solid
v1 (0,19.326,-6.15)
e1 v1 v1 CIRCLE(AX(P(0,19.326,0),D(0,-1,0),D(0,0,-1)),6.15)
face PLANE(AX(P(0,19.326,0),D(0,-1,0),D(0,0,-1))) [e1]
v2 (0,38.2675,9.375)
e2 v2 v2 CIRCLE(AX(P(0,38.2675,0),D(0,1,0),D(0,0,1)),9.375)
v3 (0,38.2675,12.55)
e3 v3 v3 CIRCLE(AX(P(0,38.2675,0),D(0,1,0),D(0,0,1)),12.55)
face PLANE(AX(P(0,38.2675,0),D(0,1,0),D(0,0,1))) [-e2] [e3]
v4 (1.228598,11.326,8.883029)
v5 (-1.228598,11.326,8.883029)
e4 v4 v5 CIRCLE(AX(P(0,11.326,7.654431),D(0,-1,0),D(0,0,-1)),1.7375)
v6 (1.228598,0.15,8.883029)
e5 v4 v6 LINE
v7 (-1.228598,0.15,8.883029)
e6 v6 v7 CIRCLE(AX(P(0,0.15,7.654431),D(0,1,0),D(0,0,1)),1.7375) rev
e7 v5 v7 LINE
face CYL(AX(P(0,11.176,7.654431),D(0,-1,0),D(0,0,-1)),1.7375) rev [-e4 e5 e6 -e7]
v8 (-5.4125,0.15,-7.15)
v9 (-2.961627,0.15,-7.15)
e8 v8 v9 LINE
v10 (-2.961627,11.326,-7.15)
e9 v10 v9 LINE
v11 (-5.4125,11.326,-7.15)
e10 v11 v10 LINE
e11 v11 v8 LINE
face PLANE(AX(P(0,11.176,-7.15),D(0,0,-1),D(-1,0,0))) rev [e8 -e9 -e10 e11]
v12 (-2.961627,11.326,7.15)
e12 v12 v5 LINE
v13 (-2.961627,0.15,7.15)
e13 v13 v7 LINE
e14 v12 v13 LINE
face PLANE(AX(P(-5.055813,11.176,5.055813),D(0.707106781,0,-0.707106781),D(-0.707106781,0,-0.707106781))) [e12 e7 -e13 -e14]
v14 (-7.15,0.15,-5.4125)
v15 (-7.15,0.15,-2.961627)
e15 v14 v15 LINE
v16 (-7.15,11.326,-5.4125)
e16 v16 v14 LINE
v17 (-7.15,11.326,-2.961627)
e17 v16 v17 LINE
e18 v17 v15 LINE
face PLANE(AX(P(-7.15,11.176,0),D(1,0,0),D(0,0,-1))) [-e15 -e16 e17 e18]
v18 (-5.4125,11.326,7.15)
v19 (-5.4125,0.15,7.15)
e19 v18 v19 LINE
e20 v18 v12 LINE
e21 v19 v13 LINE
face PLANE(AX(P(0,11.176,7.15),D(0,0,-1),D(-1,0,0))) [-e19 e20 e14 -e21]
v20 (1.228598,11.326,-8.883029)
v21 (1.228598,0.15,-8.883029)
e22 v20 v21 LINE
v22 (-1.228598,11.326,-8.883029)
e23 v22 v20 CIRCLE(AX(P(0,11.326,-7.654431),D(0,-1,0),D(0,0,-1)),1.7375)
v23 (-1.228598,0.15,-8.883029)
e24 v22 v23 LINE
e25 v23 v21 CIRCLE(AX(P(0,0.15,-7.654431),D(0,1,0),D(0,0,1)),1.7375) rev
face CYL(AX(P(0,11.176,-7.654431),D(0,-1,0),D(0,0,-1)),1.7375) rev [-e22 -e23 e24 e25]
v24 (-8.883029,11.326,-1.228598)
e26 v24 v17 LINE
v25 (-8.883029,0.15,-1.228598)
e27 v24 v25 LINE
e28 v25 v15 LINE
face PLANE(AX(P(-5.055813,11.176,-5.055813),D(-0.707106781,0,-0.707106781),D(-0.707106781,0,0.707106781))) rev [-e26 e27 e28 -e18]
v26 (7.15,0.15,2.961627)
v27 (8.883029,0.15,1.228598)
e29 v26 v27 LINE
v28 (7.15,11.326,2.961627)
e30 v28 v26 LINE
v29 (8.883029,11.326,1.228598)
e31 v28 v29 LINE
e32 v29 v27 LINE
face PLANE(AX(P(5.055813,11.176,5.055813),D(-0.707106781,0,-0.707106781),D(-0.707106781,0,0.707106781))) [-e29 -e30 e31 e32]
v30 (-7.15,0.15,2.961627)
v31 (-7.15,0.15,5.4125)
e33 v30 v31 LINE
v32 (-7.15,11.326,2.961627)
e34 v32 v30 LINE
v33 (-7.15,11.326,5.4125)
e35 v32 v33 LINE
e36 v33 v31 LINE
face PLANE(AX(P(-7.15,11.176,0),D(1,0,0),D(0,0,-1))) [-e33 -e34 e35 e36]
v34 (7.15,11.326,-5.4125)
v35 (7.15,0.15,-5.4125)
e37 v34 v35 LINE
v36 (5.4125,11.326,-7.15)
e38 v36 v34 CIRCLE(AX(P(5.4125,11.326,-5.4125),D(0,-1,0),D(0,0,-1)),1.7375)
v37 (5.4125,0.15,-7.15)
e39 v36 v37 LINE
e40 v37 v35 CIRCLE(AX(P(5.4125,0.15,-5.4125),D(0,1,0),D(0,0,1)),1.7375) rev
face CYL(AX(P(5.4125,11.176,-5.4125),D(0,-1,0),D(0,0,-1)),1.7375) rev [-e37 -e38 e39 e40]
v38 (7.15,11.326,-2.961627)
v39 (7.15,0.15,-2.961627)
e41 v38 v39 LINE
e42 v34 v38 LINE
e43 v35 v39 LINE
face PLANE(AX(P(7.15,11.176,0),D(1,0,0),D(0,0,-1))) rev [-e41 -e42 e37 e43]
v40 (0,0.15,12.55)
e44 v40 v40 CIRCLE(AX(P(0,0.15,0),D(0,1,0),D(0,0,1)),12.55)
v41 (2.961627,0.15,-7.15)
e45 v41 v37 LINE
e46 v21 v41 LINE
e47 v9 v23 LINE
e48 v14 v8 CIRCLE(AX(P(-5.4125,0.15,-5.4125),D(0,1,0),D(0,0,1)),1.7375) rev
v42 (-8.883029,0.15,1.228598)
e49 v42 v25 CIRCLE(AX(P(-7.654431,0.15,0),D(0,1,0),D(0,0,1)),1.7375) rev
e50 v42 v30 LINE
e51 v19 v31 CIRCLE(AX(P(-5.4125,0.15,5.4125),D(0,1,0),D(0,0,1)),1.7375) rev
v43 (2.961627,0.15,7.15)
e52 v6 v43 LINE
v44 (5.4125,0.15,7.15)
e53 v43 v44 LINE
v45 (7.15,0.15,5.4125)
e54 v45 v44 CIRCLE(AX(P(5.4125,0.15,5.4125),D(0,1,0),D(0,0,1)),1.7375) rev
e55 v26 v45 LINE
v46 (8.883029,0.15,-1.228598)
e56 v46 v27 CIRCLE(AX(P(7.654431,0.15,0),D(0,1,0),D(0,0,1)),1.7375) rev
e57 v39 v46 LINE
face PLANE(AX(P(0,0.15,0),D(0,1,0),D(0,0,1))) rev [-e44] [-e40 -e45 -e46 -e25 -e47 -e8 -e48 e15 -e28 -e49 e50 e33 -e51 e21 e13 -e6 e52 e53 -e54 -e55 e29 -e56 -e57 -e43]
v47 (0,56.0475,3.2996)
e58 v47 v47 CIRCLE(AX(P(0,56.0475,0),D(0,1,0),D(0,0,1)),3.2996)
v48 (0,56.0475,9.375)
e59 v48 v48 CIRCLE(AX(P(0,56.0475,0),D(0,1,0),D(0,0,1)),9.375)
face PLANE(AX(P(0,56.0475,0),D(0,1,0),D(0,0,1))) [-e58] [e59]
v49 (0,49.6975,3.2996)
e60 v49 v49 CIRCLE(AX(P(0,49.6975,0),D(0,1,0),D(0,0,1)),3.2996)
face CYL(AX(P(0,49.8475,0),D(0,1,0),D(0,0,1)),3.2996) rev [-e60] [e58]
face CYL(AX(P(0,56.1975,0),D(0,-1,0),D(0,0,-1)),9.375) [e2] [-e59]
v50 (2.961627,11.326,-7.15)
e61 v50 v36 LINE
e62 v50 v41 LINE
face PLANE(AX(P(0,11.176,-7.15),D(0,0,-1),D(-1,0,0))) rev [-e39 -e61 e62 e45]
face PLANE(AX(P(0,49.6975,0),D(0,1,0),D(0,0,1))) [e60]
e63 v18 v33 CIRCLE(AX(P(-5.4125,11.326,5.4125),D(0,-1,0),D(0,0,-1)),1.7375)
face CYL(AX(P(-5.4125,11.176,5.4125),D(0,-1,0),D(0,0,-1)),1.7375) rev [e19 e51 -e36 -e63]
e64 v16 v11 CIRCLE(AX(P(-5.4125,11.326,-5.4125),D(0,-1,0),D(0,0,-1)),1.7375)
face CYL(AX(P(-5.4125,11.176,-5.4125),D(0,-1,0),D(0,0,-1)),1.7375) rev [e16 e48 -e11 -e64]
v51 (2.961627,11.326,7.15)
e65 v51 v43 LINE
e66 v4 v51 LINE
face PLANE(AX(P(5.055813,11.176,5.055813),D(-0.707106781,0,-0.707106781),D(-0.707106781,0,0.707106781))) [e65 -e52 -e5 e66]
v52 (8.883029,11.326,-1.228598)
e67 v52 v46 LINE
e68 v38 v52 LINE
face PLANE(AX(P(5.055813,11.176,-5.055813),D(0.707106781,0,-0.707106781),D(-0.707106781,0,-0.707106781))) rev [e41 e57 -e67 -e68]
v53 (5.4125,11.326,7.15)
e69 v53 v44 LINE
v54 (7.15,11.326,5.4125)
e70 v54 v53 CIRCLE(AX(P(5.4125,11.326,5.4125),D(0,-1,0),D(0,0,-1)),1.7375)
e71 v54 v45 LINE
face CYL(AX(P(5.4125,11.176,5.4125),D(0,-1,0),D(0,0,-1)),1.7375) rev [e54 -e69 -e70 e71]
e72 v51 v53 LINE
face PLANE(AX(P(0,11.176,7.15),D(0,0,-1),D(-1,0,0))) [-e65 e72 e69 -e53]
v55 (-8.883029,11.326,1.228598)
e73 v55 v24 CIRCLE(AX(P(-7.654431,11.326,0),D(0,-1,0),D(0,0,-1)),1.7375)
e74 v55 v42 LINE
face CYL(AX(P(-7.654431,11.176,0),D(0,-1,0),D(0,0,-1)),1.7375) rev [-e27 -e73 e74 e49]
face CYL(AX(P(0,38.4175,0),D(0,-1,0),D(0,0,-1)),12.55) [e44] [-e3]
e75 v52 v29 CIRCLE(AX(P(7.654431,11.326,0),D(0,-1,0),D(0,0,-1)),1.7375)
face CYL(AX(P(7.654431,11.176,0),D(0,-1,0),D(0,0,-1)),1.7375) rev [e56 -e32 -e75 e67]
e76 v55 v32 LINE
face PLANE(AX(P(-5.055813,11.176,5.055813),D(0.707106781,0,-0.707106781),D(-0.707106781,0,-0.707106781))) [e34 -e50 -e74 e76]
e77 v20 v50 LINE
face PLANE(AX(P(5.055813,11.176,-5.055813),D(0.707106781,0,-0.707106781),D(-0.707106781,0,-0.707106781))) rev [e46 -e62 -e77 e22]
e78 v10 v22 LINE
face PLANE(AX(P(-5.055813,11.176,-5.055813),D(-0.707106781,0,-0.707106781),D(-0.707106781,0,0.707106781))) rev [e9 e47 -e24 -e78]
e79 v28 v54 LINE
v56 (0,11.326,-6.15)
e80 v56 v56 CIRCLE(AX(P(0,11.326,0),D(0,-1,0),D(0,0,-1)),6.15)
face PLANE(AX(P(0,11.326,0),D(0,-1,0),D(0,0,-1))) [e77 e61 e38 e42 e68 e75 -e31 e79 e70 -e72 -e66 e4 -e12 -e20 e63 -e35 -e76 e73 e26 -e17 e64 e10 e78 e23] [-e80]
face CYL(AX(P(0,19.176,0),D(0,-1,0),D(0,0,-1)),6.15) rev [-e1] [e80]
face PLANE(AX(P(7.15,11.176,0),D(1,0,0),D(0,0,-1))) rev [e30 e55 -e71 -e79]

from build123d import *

# Parameters (mm, degrees)
SKETCH1_R            = 12.7
BOSS_EXTRUDE1_DEPTH  = 38.4175
SKETCH4_R            = 9.525
BOSS_EXTRUDE2_DEPTH  = 17.78
CUT_EXTRUDE1_DEPTH   = 11.176
SKETCH3_R            = 6
CUT_EXTRUDE2_DEPTH   = 8
SKETCH6_R            = 3.1496
CUT_EXTRUDE3_DEPTH   = 6.35
SPLIT1_START         = 11.325999954
SPLIT1_OUTLINE_R     = 12.550000046
SPLIT1_OUTLINE_R_2   = 6.149999954
SPLIT1_DEPTH         = 26.941500092
SPLIT1_START_2       = 19.325999954
SPLIT1_2_OUTLINE_R   = 9.375000046
SPLIT1_2_OUTLINE_R_2 = 3.299599954
SPLIT1_2_DEPTH       = 36.721500092
SPLIT1_START_3       = 0.149999954
SPLIT1_3_OUTLINE_R   = 12.550000046
SPLIT1_3_DEPTH       = 11.176
SPLIT1_4_OUTLINE_R   = 3.299599954
SPLIT1_4_DEPTH       = 30.371500092
SPLIT1_5_OUTLINE_R   = 12.550000046
SPLIT1_5_OUTLINE_R_2 = 6.149999954
SPLIT1_5_DEPTH       = 26.941500092
SPLIT1_6_OUTLINE_R   = 9.375000046
SPLIT1_6_OUTLINE_R_2 = 3.299599954
SPLIT1_6_DEPTH       = 36.721500092
SPLIT1_7_OUTLINE_R   = 12.550000046
SPLIT1_7_DEPTH       = 11.176
SPLIT1_8_OUTLINE_R   = 3.299599954
SPLIT1_8_DEPTH       = 30.371500092


with BuildPart() as part:
    # Sketch1 → Boss-Extrude1 (new body)
    with BuildSketch(Plane(origin=(0, 0, 0), x_dir=(1, 0, 0), z_dir=(0, 1, 0))):
        with Locations(Location((0, 0, 0), (0, 0, 270))):
            Circle(SKETCH1_R)
    extrude(amount=BOSS_EXTRUDE1_DEPTH)

    # Sketch4 → Boss-Extrude2 (add)
    with BuildSketch(Plane(origin=(0, 38.4175, 0), x_dir=(1, 0, 0), z_dir=(0, 1, 0))):
        with Locations(Location((0, 0, 0), (0, 0, 270))):
            Circle(SKETCH4_R)
    extrude(amount=BOSS_EXTRUDE2_DEPTH)

    # Sketch2 → Cut-Extrude1 (cut)
    with BuildSketch(Plane.XZ):
        with BuildLine():
            Line((-7, 2.899494937), (-8.776962921, 1.122532015))
            ThreePointArc((-8.776962921, 1.122532015), (-9.241930906, 0), (-8.776962921, -1.122532015))
            Line((-8.776962921, -1.122532015), (-7, -2.899494937))
            Line((-7, -2.899494937), (-7, 2.899494937))
        make_face()
        Polygon((-2.899494937, 7), (-7, 2.899494937), (-7, -2.899494937), (-2.899494937, -7), (2.899494937, -7), (7, -2.899494937), (7, 2.899494937), (2.899494937, 7), align=None)
        with BuildLine():
            Line((-7, 5.4125), (-7, 2.899494937))
            Line((-7, 2.899494937), (-2.899494937, 7))
            Line((-2.899494937, 7), (-5.4125, 7))
            ThreePointArc((-5.4125, 7), (-6.535032015, 6.535032015), (-7, 5.4125))
        make_face()
        with BuildLine():
            Line((-1.122532015, 8.776962921), (-2.899494937, 7))
            Line((-2.899494937, 7), (2.899494937, 7))
            Line((2.899494937, 7), (1.122532015, 8.776962921))
            ThreePointArc((1.122532015, 8.776962921), (0, 9.241930906), (-1.122532015, 8.776962921))
        make_face()
        with BuildLine():
            Line((5.4125, 7), (2.899494937, 7))
            Line((2.899494937, 7), (7, 2.899494937))
            Line((7, 2.899494937), (7, 5.4125))
            ThreePointArc((7, 5.4125), (6.535032015, 6.535032015), (5.4125, 7))
        make_face()
        with BuildLine():
            Line((8.776962921, 1.122532015), (7, 2.899494937))
            Line((7, 2.899494937), (7, -2.899494937))
            Line((7, -2.899494937), (8.776962921, -1.122532015))
            ThreePointArc((8.776962921, -1.122532015), (9.241930906, 0), (8.776962921, 1.122532015))
        make_face()
        with BuildLine():
            Line((7, -2.899494937), (2.899494937, -7))
            Line((2.899494937, -7), (5.4125, -7))
            ThreePointArc((5.4125, -7), (6.535032015, -6.535032015), (7, -5.4125))
            Line((7, -5.4125), (7, -2.899494937))
        make_face()
        with BuildLine():
            Line((2.899494937, -7), (-2.899494937, -7))
            Line((-2.899494937, -7), (-1.122532015, -8.776962921))
            ThreePointArc((-1.122532015, -8.776962921), (0, -9.241930906), (1.122532015, -8.776962921))
            Line((1.122532015, -8.776962921), (2.899494937, -7))
        make_face()
        with BuildLine():
            Line((-2.899494937, -7), (-7, -2.899494937))
            Line((-7, -2.899494937), (-7, -5.4125))
            ThreePointArc((-7, -5.4125), (-6.535032015, -6.535032015), (-5.4125, -7))
            Line((-5.4125, -7), (-2.899494937, -7))
        make_face()
    extrude(amount=-CUT_EXTRUDE1_DEPTH, mode=Mode.SUBTRACT)

    # Sketch3 → Cut-Extrude2 (cut)
    with BuildSketch(Plane.XZ.offset(-11.176)):
        with Locations(Location((0, 0, 0), (0, 0, 270))):
            Circle(SKETCH3_R)
    extrude(amount=-CUT_EXTRUDE2_DEPTH, mode=Mode.SUBTRACT)

    # Sketch6 → Cut-Extrude3 (cut)
    with BuildSketch(Plane(origin=(0, 56.1975, 0), x_dir=(1, 0, 0), z_dir=(0, 1, 0))):
        with Locations(Location((0, 0, 0), (0, 0, 270))):
            Circle(SKETCH6_R)
    extrude(amount=-CUT_EXTRUDE3_DEPTH, mode=Mode.SUBTRACT)

    # Split1 5 outline → Split1 5 (cut)
    with BuildSketch(Plane(origin=(0, 0, 0), x_dir=(1, 0, 0), z_dir=(0, 1, 0)).offset(SPLIT1_START)):
        Circle(SPLIT1_5_OUTLINE_R)
        Circle(SPLIT1_5_OUTLINE_R_2, mode=Mode.SUBTRACT)
    extrude(amount=SPLIT1_5_DEPTH, mode=Mode.SUBTRACT)

    # Split1 6 outline → Split1 6 (cut)
    with BuildSketch(Plane(origin=(0, 0, 0), x_dir=(1, 0, 0), z_dir=(0, 1, 0)).offset(SPLIT1_START_2)):
        Circle(SPLIT1_6_OUTLINE_R)
        Circle(SPLIT1_6_OUTLINE_R_2, mode=Mode.SUBTRACT)
    extrude(amount=SPLIT1_6_DEPTH, mode=Mode.SUBTRACT)

    # Split1 7 outline → Split1 7 (cut)
    with BuildSketch(Plane(origin=(0, 0, 0), x_dir=(1, 0, 0), z_dir=(0, 1, 0)).offset(SPLIT1_START_3)):
        Circle(SPLIT1_7_OUTLINE_R)
        with BuildLine():
            Line((-7.149999954, -2.961626952), (-8.883028906, -1.228598))
            ThreePointArc((-8.883028906, -1.228598), (-9.39193086, 0), (-8.883028906, 1.228598))
            Line((-8.883028906, 1.228598), (-7.149999954, 2.961626952))
            Line((-7.149999954, 2.961626952), (-7.149999954, 5.4125))
            ThreePointArc((-7.149999954, 5.4125), (-6.641098, 6.641098), (-5.4125, 7.149999954))
            Line((-5.4125, 7.149999954), (-2.961626952, 7.149999954))
            Line((-2.961626952, 7.149999954), (-1.228598, 8.883028906))
            ThreePointArc((-1.228598, 8.883028906), (0, 9.39193086), (1.228598, 8.883028906))
            Line((1.228598, 8.883028906), (2.961626952, 7.149999954))
            Line((2.961626952, 7.149999954), (5.4125, 7.149999954))
            ThreePointArc((5.4125, 7.149999954), (6.641098, 6.641098), (7.149999954, 5.4125))
            Line((7.149999954, 5.4125), (7.149999954, 2.961626952))
            Line((7.149999954, 2.961626952), (8.883028906, 1.228598))
            ThreePointArc((8.883028906, 1.228598), (9.39193086, 0), (8.883028906, -1.228598))
            Line((8.883028906, -1.228598), (7.149999954, -2.961626952))
            Line((7.149999954, -2.961626952), (7.149999954, -5.4125))
            ThreePointArc((7.149999954, -5.4125), (6.641098, -6.641098), (5.4125, -7.149999954))
            Line((5.4125, -7.149999954), (2.961626952, -7.149999954))
            Line((2.961626952, -7.149999954), (1.228598, -8.883028906))
            ThreePointArc((1.228598, -8.883028906), (0, -9.39193086), (-1.228598, -8.883028906))
            Line((-1.228598, -8.883028906), (-2.961626952, -7.149999954))
            Line((-2.961626952, -7.149999954), (-5.4125, -7.149999954))
            ThreePointArc((-5.4125, -7.149999954), (-6.641098, -6.641098), (-7.149999954, -5.4125))
            Line((-7.149999954, -5.4125), (-7.149999954, -2.961626952))
        make_face(mode=Mode.SUBTRACT)
    extrude(amount=SPLIT1_7_DEPTH, mode=Mode.SUBTRACT)

    # Split1 8 outline → Split1 8 (cut)
    with BuildSketch(Plane(origin=(0, 0, 0), x_dir=(1, 0, 0), z_dir=(0, 1, 0)).offset(SPLIT1_START_2)):
        Circle(SPLIT1_8_OUTLINE_R)
    extrude(amount=SPLIT1_8_DEPTH, mode=Mode.SUBTRACT)


with BuildPart() as body_2:
    # Split1: read off the stored shape, not the designer's step
    # Split1 outline → Split1 (new body)
    with BuildSketch(Plane(origin=(0, 0, 0), x_dir=(1, 0, 0), z_dir=(0, 1, 0)).offset(SPLIT1_START)):
        Circle(SPLIT1_OUTLINE_R)
        Circle(SPLIT1_OUTLINE_R_2, mode=Mode.SUBTRACT)
    extrude(amount=SPLIT1_DEPTH)

    # Split1 2 outline → Split1 2 (add)
    with BuildSketch(Plane(origin=(0, 0, 0), x_dir=(1, 0, 0), z_dir=(0, 1, 0)).offset(SPLIT1_START_2)):
        Circle(SPLIT1_2_OUTLINE_R)
        Circle(SPLIT1_2_OUTLINE_R_2, mode=Mode.SUBTRACT)
    extrude(amount=SPLIT1_2_DEPTH)

    # Split1 3 outline → Split1 3 (add)
    with BuildSketch(Plane(origin=(0, 0, 0), x_dir=(1, 0, 0), z_dir=(0, 1, 0)).offset(SPLIT1_START_3)):
        Circle(SPLIT1_3_OUTLINE_R)
        with BuildLine():
            Line((7.149999954, 5.4125), (7.149999954, 2.961626952))
            Line((7.149999954, 2.961626952), (8.883028906, 1.228598))
            ThreePointArc((8.883028906, 1.228598), (9.39193086, 0), (8.883028906, -1.228598))
            Line((8.883028906, -1.228598), (7.149999954, -2.961626952))
            Line((7.149999954, -2.961626952), (7.149999954, -5.4125))
            ThreePointArc((7.149999954, -5.4125), (6.641098, -6.641098), (5.4125, -7.149999954))
            Line((5.4125, -7.149999954), (2.961626952, -7.149999954))
            Line((2.961626952, -7.149999954), (1.228598, -8.883028906))
            ThreePointArc((1.228598, -8.883028906), (0, -9.39193086), (-1.228598, -8.883028906))
            Line((-1.228598, -8.883028906), (-2.961626952, -7.149999954))
            Line((-2.961626952, -7.149999954), (-5.4125, -7.149999954))
            ThreePointArc((-5.4125, -7.149999954), (-6.641098, -6.641098), (-7.149999954, -5.4125))
            Line((-7.149999954, -5.4125), (-7.149999954, -2.961626952))
            Line((-7.149999954, -2.961626952), (-8.883028906, -1.228598))
            ThreePointArc((-8.883028906, -1.228598), (-9.39193086, 0), (-8.883028906, 1.228598))
            Line((-8.883028906, 1.228598), (-7.149999954, 2.961626952))
            Line((-7.149999954, 2.961626952), (-7.149999954, 5.4125))
            ThreePointArc((-7.149999954, 5.4125), (-6.641098, 6.641098), (-5.4125, 7.149999954))
            Line((-5.4125, 7.149999954), (-2.961626952, 7.149999954))
            Line((-2.961626952, 7.149999954), (-1.228598, 8.883028906))
            ThreePointArc((-1.228598, 8.883028906), (0, 9.39193086), (1.228598, 8.883028906))
            Line((1.228598, 8.883028906), (2.961626952, 7.149999954))
            Line((2.961626952, 7.149999954), (5.4125, 7.149999954))
            ThreePointArc((5.4125, 7.149999954), (6.641098, 6.641098), (7.149999954, 5.4125))
        make_face(mode=Mode.SUBTRACT)
    extrude(amount=SPLIT1_3_DEPTH)

    # Split1 4 outline → Split1 4 (add)
    with BuildSketch(Plane(origin=(0, 0, 0), x_dir=(1, 0, 0), z_dir=(0, 1, 0)).offset(SPLIT1_START_2)):
        Circle(SPLIT1_4_OUTLINE_R)
    extrude(amount=SPLIT1_4_DEPTH)


solid = body_2.part
